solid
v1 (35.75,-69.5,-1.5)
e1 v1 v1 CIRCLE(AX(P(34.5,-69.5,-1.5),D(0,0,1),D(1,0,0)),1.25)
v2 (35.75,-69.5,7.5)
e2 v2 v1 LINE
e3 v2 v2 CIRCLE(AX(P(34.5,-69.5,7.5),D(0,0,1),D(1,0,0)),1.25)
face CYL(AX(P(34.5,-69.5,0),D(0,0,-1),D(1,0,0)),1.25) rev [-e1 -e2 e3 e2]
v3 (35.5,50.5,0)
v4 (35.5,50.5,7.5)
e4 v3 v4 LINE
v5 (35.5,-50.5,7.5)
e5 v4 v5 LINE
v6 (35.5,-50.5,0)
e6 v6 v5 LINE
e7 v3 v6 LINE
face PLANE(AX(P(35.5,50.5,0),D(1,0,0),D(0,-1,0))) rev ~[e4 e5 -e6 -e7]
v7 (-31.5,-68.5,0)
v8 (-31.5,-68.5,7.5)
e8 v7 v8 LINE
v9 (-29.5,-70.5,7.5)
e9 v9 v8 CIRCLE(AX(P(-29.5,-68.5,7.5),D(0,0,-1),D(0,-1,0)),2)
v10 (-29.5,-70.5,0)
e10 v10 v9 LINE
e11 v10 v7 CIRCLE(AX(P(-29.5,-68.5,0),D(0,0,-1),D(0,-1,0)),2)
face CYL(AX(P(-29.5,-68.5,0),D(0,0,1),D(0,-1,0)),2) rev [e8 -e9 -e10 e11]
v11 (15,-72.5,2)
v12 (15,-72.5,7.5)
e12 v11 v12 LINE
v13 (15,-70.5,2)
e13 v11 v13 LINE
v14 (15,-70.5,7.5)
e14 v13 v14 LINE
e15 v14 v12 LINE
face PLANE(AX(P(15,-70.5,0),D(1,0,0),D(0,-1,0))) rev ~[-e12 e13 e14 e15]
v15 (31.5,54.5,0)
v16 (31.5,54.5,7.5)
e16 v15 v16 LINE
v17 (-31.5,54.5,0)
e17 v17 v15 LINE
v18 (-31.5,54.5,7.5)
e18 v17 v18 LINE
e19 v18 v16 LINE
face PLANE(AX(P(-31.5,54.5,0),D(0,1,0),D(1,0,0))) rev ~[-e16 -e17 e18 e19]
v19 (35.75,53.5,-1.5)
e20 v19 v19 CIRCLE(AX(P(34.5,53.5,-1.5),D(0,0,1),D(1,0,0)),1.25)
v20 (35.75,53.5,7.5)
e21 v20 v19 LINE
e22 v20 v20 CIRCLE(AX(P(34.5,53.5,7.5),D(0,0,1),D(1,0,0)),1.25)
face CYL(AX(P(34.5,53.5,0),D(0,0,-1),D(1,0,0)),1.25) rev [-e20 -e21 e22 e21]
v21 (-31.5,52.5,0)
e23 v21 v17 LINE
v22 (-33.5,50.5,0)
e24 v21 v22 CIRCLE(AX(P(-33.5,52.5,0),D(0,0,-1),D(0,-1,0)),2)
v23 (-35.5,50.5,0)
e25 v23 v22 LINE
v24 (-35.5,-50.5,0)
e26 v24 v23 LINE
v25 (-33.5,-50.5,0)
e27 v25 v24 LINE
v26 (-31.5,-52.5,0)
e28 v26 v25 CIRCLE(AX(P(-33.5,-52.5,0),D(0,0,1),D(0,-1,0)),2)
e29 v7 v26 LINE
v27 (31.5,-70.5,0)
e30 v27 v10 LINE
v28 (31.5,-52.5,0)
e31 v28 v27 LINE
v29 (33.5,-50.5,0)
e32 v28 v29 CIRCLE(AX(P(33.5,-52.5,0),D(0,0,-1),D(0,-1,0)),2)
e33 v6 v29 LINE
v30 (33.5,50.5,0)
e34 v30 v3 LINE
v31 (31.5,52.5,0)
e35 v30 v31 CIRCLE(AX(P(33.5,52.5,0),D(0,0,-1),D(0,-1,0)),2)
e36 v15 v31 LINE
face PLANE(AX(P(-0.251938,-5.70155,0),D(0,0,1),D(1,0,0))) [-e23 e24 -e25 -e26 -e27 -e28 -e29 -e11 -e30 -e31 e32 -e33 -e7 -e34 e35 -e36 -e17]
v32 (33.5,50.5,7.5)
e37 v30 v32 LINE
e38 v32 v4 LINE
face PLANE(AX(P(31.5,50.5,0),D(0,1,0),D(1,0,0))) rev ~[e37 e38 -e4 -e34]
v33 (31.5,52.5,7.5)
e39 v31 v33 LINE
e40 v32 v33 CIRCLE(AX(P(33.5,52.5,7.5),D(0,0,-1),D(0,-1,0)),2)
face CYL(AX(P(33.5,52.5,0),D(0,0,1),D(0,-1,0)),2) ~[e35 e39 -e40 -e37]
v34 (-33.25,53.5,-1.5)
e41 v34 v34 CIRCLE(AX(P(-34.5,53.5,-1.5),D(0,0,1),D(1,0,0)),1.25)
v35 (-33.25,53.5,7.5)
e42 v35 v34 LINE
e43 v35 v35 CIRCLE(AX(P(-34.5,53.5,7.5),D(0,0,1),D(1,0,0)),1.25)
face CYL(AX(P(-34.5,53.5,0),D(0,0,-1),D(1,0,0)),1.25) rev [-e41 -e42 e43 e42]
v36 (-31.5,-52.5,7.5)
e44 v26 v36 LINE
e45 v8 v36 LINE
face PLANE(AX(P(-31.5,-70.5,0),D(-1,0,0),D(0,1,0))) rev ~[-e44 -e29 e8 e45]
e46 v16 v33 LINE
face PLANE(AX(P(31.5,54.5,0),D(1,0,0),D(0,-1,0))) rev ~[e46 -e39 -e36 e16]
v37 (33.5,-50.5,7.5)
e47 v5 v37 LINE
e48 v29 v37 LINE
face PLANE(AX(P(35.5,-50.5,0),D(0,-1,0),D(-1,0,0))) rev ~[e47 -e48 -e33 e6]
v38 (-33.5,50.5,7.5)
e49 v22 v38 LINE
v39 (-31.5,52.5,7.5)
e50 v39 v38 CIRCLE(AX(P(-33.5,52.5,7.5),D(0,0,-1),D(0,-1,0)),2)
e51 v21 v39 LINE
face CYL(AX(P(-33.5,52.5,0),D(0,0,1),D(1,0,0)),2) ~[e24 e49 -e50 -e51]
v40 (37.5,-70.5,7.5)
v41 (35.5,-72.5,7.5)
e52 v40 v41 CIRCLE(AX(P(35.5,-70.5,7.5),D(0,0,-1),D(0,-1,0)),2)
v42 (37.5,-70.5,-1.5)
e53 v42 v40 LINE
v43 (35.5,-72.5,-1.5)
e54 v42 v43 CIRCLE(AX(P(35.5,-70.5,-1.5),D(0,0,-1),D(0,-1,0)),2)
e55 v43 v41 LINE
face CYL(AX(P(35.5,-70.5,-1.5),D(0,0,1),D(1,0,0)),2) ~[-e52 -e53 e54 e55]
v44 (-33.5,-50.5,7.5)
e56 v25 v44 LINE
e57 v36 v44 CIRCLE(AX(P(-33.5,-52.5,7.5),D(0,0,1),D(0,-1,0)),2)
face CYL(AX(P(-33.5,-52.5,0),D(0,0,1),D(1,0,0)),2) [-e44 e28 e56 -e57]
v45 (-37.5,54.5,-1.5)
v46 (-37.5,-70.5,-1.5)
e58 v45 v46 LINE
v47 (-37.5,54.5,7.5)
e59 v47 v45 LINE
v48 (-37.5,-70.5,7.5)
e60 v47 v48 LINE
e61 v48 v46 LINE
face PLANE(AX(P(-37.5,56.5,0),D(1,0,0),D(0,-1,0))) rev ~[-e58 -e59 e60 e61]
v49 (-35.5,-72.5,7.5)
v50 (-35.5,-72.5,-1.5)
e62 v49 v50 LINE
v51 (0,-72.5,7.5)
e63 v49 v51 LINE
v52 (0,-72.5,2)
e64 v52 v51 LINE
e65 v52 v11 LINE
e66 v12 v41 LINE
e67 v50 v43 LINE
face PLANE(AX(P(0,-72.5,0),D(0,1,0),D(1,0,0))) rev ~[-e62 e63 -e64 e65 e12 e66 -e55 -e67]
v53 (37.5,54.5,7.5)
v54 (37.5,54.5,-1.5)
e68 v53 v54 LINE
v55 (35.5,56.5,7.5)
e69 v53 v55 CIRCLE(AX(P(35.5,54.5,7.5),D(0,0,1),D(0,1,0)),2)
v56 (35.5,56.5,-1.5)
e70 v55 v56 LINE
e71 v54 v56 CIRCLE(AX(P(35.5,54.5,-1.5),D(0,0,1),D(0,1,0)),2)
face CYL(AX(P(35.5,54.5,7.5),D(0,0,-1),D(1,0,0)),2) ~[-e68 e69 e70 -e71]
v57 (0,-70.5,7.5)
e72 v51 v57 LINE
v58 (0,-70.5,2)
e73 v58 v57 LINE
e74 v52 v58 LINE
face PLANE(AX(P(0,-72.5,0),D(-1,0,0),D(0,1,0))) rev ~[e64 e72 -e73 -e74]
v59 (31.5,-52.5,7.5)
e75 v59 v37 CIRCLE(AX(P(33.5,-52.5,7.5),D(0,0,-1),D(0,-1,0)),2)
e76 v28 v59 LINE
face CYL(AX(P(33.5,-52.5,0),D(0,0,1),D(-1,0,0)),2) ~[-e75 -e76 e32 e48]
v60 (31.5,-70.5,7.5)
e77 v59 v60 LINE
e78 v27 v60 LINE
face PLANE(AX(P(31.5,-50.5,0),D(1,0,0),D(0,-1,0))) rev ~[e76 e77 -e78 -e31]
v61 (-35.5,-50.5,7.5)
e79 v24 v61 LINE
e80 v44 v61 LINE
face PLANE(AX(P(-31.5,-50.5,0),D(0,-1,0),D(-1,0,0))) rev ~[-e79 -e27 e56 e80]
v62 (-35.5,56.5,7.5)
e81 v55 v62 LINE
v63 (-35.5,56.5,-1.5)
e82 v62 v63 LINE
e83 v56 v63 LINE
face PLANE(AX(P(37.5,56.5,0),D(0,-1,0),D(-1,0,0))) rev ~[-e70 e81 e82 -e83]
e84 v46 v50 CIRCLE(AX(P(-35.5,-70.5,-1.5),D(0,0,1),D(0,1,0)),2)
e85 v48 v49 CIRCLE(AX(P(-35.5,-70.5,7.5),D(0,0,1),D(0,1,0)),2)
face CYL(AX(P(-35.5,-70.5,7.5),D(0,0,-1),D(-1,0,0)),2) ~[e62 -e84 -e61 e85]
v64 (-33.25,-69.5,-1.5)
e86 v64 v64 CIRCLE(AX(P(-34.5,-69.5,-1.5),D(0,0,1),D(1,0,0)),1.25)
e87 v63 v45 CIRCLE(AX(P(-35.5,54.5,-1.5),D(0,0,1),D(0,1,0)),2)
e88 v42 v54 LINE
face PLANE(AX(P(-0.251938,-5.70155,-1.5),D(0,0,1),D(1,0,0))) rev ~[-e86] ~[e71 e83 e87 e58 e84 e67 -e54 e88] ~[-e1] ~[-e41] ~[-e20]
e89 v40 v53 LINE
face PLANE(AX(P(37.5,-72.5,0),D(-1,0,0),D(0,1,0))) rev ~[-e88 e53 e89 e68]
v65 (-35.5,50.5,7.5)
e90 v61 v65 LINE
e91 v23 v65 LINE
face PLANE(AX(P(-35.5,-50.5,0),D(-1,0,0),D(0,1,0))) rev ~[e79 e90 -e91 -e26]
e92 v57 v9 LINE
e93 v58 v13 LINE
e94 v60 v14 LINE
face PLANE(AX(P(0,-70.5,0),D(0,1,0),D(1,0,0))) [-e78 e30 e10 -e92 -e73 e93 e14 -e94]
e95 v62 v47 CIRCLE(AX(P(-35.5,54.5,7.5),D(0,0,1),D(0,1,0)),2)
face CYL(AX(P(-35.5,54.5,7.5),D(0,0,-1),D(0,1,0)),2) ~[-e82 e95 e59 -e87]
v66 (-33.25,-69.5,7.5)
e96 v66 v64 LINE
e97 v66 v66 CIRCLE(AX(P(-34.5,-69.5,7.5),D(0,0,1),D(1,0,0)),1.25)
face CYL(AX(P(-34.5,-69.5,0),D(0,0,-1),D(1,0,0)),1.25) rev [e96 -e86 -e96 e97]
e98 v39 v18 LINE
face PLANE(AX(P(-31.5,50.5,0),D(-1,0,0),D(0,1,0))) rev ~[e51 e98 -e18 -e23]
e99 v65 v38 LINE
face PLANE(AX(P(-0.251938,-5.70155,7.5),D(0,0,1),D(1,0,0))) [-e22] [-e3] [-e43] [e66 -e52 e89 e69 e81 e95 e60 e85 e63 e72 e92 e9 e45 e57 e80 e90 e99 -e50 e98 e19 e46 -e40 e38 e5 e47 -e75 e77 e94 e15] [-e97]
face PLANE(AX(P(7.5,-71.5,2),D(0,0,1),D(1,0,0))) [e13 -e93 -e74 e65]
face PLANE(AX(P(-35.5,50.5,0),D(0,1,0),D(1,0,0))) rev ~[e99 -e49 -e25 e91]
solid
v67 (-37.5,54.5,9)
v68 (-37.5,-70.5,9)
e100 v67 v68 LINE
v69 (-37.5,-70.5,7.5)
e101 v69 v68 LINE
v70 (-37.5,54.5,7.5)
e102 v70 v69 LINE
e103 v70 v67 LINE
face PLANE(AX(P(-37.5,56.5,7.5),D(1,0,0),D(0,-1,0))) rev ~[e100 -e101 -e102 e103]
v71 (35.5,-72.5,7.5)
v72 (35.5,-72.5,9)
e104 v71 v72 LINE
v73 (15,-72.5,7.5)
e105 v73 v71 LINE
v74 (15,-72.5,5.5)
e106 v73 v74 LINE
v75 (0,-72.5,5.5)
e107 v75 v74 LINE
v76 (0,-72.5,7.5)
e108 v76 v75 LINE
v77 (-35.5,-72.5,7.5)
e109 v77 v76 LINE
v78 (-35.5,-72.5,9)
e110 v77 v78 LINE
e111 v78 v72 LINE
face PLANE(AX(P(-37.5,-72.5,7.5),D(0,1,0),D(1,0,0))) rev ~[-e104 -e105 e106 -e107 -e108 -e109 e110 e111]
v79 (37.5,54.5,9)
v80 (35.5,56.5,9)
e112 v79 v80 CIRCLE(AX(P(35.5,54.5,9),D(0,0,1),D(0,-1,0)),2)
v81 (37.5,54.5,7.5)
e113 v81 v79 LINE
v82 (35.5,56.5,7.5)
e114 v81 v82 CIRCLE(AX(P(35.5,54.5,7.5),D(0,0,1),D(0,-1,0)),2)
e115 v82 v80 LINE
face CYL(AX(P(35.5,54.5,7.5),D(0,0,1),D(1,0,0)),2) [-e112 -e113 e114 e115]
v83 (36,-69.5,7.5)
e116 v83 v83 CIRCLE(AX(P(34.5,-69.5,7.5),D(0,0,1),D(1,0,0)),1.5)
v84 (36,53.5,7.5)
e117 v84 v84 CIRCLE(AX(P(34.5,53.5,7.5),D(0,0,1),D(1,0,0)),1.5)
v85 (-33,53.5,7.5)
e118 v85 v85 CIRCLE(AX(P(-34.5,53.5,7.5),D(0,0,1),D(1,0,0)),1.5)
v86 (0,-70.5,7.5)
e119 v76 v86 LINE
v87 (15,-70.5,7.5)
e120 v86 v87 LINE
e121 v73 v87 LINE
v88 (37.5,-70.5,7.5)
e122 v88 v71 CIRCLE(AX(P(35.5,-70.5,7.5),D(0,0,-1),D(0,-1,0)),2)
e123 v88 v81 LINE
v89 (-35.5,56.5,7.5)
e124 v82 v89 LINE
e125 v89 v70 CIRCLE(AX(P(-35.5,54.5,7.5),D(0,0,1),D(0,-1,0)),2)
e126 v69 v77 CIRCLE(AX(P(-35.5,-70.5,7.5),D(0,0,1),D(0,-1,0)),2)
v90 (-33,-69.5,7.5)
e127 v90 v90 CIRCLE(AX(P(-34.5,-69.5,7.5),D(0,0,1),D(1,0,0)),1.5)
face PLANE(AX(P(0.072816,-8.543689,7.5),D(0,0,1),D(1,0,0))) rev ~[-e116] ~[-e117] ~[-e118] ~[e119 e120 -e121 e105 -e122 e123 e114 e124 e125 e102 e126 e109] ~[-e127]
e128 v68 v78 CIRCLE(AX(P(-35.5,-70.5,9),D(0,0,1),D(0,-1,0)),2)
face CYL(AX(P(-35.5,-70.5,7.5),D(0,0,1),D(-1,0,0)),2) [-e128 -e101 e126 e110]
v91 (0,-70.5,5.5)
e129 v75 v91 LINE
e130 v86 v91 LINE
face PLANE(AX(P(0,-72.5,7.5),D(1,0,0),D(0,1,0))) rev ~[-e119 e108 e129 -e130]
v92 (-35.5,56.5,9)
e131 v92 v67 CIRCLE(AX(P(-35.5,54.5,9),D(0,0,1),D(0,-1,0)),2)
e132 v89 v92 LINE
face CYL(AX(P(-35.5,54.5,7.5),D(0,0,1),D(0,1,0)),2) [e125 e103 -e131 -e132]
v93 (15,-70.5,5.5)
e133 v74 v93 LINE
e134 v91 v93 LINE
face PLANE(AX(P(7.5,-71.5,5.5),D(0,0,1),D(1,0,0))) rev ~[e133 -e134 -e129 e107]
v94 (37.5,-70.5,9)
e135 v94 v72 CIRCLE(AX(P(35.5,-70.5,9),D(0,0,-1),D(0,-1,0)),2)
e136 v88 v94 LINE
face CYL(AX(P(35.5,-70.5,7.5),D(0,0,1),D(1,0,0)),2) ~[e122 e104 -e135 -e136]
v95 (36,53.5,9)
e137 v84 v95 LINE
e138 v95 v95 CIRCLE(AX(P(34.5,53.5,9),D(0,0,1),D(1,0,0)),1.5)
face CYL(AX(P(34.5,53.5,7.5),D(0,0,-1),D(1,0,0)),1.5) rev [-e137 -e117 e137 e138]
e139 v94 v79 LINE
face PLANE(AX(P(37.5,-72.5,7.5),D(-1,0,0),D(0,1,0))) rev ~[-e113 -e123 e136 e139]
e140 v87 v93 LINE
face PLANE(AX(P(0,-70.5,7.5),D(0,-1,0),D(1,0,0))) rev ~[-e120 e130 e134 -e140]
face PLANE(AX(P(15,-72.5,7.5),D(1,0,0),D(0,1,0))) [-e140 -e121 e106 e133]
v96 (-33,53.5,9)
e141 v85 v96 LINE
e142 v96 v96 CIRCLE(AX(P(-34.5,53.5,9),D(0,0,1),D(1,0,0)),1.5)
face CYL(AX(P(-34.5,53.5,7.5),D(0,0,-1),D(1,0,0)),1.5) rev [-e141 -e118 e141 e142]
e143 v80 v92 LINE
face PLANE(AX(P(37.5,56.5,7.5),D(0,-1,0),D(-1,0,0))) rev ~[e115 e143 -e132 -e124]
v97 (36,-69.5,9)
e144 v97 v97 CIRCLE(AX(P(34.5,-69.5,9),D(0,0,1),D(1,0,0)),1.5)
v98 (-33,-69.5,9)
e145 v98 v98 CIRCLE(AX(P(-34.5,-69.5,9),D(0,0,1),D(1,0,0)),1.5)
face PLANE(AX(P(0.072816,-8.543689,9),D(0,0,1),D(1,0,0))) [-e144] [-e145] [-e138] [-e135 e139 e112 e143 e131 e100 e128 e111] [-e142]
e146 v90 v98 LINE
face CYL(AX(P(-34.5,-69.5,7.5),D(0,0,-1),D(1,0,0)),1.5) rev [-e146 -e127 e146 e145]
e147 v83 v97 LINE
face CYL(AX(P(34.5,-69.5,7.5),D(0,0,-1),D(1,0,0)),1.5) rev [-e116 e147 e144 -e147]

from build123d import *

# Parameters (mm, degrees)
F0_R     = 1.25
F0_W     = 15
F0_H     = 2
F1_DEPTH = 1.5
F2_DEPTH = 7.5
F3_R     = 2
F4_DEPTH = 2
F5_R     = 1.5
F5_W     = 15
F5_H     = 2
F6_DEPTH = 1.5
F7_R     = 2
F8_DEPTH = 2


# Not quite as in the source:
# - a feature names something its author has since deleted; it is built from what else it names


with BuildPart() as f1:
    # F0 (on Top) → F1 (new body)
    with BuildSketch(Plane.XY):
        Polygon((-35.5, -50.5), (-35.5, 50.5), (-31.5, 50.5), (-31.5, 54.5), (31.5, 54.5), (31.5, 50.5), (35.5, 50.5), (35.5, -50.5), (31.5, -50.5), (31.5, -70.5), (15, -70.5), (15, -72.5), (37.5, -72.5), (37.5, -56.5), (37.5, 56.5), (-37.5, 56.5), (-37.5, -56.5), (-37.5, -72.5), (0, -72.5), (0, -70.5), (-31.5, -70.5), (-31.5, -50.5), align=None)
        with Locations((-34.5, -69.5)):
            Circle(F0_R, mode=Mode.SUBTRACT)
        with Locations((34.5, -69.5)):
            Circle(F0_R, mode=Mode.SUBTRACT)
        with Locations((-34.5, 53.5)):
            Circle(F0_R, mode=Mode.SUBTRACT)
        with Locations((34.5, 53.5)):
            Circle(F0_R, mode=Mode.SUBTRACT)
        Polygon((-31.5, 50.5), (-35.5, 50.5), (-35.5, -50.5), (-31.5, -50.5), (-31.5, -70.5), (0, -70.5), (15, -70.5), (31.5, -70.5), (31.5, -50.5), (35.5, -50.5), (35.5, 50.5), (31.5, 50.5), (31.5, 54.5), (-31.5, 54.5), align=None)
        with Locations((7.5, -71.5)):
            Rectangle(F0_W, F0_H)
    extrude(amount=-F1_DEPTH)

    # F0 (on Top) → F2 (join)
    with BuildSketch(Plane.XY):
        Polygon((-35.5, -50.5), (-35.5, 50.5), (-31.5, 50.5), (-31.5, 54.5), (31.5, 54.5), (31.5, 50.5), (35.5, 50.5), (35.5, -50.5), (31.5, -50.5), (31.5, -70.5), (15, -70.5), (15, -72.5), (37.5, -72.5), (37.5, -56.5), (37.5, 56.5), (-37.5, 56.5), (-37.5, -56.5), (-37.5, -72.5), (0, -72.5), (0, -70.5), (-31.5, -70.5), (-31.5, -50.5), align=None)
        with Locations((-34.5, -69.5)):
            Circle(F0_R, mode=Mode.SUBTRACT)
        with Locations((34.5, -69.5)):
            Circle(F0_R, mode=Mode.SUBTRACT)
        with Locations((-34.5, 53.5)):
            Circle(F0_R, mode=Mode.SUBTRACT)
        with Locations((34.5, 53.5)):
            Circle(F0_R, mode=Mode.SUBTRACT)
    extrude(amount=F2_DEPTH)

    # F3
    f3_edges = [f1.edges().sort_by_distance(p)[0] for p in [
        (37.5, 56.5, 3),
        (-37.5, 56.5, 3),
        (31.5, -50.5, 3.75),
        (-31.5, 50.5, 3.75),
        (31.5, 50.5, 3.75),
        (-31.5, -50.5, 3.75),
        (37.5, -72.5, 3),
        (-37.5, -72.5, 3),
        (-31.5, -70.5, 3.75),
    ]]
    fillet(f3_edges, radius=F3_R)

    # F0 (on Top) → F4 (join)
    with BuildSketch(Plane.XY):
        with Locations((7.5, -71.5)):
            Rectangle(F0_W, F0_H)
    extrude(amount=F4_DEPTH)


with BuildPart() as f6:
    # F5 (on face) → F6 (new body)
    with BuildSketch(Plane.XY.offset(7.5)):
        Polygon((37.5, -72.5), (37.5, 56.5), (-37.5, 56.5), (-37.5, -72.5), (0, -72.5), (0, -70.5), (15, -70.5), (15, -72.5), align=None)
        with Locations((-34.5, -69.5)):
            Circle(F5_R, mode=Mode.SUBTRACT)
        with Locations((34.5, -69.5)):
            Circle(F5_R, mode=Mode.SUBTRACT)
        with Locations((-34.5, 53.5)):
            Circle(F5_R, mode=Mode.SUBTRACT)
        with Locations((34.5, 53.5)):
            Circle(F5_R, mode=Mode.SUBTRACT)
        with Locations((7.5, -71.5)):
            Rectangle(F5_W, F5_H)
    extrude(amount=F6_DEPTH)

    # F7
    f7_edges = [f6.edges().sort_by_distance(p)[0] for p in [
        (-37.5, 56.5, 8.25),
        (37.5, 56.5, 8.25),
        (-37.5, -72.5, 8.25),
        (37.5, -72.5, 8.25),
    ]]
    fillet(f7_edges, radius=F7_R)

    # F5 (on face) → F8 (join)
    with BuildSketch(Plane.XY.offset(7.5)):
        with Locations((7.5, -71.5)):
            Rectangle(F5_W, F5_H)
    extrude(amount=-F8_DEPTH)


solid = Compound([f1.part, f6.part])
